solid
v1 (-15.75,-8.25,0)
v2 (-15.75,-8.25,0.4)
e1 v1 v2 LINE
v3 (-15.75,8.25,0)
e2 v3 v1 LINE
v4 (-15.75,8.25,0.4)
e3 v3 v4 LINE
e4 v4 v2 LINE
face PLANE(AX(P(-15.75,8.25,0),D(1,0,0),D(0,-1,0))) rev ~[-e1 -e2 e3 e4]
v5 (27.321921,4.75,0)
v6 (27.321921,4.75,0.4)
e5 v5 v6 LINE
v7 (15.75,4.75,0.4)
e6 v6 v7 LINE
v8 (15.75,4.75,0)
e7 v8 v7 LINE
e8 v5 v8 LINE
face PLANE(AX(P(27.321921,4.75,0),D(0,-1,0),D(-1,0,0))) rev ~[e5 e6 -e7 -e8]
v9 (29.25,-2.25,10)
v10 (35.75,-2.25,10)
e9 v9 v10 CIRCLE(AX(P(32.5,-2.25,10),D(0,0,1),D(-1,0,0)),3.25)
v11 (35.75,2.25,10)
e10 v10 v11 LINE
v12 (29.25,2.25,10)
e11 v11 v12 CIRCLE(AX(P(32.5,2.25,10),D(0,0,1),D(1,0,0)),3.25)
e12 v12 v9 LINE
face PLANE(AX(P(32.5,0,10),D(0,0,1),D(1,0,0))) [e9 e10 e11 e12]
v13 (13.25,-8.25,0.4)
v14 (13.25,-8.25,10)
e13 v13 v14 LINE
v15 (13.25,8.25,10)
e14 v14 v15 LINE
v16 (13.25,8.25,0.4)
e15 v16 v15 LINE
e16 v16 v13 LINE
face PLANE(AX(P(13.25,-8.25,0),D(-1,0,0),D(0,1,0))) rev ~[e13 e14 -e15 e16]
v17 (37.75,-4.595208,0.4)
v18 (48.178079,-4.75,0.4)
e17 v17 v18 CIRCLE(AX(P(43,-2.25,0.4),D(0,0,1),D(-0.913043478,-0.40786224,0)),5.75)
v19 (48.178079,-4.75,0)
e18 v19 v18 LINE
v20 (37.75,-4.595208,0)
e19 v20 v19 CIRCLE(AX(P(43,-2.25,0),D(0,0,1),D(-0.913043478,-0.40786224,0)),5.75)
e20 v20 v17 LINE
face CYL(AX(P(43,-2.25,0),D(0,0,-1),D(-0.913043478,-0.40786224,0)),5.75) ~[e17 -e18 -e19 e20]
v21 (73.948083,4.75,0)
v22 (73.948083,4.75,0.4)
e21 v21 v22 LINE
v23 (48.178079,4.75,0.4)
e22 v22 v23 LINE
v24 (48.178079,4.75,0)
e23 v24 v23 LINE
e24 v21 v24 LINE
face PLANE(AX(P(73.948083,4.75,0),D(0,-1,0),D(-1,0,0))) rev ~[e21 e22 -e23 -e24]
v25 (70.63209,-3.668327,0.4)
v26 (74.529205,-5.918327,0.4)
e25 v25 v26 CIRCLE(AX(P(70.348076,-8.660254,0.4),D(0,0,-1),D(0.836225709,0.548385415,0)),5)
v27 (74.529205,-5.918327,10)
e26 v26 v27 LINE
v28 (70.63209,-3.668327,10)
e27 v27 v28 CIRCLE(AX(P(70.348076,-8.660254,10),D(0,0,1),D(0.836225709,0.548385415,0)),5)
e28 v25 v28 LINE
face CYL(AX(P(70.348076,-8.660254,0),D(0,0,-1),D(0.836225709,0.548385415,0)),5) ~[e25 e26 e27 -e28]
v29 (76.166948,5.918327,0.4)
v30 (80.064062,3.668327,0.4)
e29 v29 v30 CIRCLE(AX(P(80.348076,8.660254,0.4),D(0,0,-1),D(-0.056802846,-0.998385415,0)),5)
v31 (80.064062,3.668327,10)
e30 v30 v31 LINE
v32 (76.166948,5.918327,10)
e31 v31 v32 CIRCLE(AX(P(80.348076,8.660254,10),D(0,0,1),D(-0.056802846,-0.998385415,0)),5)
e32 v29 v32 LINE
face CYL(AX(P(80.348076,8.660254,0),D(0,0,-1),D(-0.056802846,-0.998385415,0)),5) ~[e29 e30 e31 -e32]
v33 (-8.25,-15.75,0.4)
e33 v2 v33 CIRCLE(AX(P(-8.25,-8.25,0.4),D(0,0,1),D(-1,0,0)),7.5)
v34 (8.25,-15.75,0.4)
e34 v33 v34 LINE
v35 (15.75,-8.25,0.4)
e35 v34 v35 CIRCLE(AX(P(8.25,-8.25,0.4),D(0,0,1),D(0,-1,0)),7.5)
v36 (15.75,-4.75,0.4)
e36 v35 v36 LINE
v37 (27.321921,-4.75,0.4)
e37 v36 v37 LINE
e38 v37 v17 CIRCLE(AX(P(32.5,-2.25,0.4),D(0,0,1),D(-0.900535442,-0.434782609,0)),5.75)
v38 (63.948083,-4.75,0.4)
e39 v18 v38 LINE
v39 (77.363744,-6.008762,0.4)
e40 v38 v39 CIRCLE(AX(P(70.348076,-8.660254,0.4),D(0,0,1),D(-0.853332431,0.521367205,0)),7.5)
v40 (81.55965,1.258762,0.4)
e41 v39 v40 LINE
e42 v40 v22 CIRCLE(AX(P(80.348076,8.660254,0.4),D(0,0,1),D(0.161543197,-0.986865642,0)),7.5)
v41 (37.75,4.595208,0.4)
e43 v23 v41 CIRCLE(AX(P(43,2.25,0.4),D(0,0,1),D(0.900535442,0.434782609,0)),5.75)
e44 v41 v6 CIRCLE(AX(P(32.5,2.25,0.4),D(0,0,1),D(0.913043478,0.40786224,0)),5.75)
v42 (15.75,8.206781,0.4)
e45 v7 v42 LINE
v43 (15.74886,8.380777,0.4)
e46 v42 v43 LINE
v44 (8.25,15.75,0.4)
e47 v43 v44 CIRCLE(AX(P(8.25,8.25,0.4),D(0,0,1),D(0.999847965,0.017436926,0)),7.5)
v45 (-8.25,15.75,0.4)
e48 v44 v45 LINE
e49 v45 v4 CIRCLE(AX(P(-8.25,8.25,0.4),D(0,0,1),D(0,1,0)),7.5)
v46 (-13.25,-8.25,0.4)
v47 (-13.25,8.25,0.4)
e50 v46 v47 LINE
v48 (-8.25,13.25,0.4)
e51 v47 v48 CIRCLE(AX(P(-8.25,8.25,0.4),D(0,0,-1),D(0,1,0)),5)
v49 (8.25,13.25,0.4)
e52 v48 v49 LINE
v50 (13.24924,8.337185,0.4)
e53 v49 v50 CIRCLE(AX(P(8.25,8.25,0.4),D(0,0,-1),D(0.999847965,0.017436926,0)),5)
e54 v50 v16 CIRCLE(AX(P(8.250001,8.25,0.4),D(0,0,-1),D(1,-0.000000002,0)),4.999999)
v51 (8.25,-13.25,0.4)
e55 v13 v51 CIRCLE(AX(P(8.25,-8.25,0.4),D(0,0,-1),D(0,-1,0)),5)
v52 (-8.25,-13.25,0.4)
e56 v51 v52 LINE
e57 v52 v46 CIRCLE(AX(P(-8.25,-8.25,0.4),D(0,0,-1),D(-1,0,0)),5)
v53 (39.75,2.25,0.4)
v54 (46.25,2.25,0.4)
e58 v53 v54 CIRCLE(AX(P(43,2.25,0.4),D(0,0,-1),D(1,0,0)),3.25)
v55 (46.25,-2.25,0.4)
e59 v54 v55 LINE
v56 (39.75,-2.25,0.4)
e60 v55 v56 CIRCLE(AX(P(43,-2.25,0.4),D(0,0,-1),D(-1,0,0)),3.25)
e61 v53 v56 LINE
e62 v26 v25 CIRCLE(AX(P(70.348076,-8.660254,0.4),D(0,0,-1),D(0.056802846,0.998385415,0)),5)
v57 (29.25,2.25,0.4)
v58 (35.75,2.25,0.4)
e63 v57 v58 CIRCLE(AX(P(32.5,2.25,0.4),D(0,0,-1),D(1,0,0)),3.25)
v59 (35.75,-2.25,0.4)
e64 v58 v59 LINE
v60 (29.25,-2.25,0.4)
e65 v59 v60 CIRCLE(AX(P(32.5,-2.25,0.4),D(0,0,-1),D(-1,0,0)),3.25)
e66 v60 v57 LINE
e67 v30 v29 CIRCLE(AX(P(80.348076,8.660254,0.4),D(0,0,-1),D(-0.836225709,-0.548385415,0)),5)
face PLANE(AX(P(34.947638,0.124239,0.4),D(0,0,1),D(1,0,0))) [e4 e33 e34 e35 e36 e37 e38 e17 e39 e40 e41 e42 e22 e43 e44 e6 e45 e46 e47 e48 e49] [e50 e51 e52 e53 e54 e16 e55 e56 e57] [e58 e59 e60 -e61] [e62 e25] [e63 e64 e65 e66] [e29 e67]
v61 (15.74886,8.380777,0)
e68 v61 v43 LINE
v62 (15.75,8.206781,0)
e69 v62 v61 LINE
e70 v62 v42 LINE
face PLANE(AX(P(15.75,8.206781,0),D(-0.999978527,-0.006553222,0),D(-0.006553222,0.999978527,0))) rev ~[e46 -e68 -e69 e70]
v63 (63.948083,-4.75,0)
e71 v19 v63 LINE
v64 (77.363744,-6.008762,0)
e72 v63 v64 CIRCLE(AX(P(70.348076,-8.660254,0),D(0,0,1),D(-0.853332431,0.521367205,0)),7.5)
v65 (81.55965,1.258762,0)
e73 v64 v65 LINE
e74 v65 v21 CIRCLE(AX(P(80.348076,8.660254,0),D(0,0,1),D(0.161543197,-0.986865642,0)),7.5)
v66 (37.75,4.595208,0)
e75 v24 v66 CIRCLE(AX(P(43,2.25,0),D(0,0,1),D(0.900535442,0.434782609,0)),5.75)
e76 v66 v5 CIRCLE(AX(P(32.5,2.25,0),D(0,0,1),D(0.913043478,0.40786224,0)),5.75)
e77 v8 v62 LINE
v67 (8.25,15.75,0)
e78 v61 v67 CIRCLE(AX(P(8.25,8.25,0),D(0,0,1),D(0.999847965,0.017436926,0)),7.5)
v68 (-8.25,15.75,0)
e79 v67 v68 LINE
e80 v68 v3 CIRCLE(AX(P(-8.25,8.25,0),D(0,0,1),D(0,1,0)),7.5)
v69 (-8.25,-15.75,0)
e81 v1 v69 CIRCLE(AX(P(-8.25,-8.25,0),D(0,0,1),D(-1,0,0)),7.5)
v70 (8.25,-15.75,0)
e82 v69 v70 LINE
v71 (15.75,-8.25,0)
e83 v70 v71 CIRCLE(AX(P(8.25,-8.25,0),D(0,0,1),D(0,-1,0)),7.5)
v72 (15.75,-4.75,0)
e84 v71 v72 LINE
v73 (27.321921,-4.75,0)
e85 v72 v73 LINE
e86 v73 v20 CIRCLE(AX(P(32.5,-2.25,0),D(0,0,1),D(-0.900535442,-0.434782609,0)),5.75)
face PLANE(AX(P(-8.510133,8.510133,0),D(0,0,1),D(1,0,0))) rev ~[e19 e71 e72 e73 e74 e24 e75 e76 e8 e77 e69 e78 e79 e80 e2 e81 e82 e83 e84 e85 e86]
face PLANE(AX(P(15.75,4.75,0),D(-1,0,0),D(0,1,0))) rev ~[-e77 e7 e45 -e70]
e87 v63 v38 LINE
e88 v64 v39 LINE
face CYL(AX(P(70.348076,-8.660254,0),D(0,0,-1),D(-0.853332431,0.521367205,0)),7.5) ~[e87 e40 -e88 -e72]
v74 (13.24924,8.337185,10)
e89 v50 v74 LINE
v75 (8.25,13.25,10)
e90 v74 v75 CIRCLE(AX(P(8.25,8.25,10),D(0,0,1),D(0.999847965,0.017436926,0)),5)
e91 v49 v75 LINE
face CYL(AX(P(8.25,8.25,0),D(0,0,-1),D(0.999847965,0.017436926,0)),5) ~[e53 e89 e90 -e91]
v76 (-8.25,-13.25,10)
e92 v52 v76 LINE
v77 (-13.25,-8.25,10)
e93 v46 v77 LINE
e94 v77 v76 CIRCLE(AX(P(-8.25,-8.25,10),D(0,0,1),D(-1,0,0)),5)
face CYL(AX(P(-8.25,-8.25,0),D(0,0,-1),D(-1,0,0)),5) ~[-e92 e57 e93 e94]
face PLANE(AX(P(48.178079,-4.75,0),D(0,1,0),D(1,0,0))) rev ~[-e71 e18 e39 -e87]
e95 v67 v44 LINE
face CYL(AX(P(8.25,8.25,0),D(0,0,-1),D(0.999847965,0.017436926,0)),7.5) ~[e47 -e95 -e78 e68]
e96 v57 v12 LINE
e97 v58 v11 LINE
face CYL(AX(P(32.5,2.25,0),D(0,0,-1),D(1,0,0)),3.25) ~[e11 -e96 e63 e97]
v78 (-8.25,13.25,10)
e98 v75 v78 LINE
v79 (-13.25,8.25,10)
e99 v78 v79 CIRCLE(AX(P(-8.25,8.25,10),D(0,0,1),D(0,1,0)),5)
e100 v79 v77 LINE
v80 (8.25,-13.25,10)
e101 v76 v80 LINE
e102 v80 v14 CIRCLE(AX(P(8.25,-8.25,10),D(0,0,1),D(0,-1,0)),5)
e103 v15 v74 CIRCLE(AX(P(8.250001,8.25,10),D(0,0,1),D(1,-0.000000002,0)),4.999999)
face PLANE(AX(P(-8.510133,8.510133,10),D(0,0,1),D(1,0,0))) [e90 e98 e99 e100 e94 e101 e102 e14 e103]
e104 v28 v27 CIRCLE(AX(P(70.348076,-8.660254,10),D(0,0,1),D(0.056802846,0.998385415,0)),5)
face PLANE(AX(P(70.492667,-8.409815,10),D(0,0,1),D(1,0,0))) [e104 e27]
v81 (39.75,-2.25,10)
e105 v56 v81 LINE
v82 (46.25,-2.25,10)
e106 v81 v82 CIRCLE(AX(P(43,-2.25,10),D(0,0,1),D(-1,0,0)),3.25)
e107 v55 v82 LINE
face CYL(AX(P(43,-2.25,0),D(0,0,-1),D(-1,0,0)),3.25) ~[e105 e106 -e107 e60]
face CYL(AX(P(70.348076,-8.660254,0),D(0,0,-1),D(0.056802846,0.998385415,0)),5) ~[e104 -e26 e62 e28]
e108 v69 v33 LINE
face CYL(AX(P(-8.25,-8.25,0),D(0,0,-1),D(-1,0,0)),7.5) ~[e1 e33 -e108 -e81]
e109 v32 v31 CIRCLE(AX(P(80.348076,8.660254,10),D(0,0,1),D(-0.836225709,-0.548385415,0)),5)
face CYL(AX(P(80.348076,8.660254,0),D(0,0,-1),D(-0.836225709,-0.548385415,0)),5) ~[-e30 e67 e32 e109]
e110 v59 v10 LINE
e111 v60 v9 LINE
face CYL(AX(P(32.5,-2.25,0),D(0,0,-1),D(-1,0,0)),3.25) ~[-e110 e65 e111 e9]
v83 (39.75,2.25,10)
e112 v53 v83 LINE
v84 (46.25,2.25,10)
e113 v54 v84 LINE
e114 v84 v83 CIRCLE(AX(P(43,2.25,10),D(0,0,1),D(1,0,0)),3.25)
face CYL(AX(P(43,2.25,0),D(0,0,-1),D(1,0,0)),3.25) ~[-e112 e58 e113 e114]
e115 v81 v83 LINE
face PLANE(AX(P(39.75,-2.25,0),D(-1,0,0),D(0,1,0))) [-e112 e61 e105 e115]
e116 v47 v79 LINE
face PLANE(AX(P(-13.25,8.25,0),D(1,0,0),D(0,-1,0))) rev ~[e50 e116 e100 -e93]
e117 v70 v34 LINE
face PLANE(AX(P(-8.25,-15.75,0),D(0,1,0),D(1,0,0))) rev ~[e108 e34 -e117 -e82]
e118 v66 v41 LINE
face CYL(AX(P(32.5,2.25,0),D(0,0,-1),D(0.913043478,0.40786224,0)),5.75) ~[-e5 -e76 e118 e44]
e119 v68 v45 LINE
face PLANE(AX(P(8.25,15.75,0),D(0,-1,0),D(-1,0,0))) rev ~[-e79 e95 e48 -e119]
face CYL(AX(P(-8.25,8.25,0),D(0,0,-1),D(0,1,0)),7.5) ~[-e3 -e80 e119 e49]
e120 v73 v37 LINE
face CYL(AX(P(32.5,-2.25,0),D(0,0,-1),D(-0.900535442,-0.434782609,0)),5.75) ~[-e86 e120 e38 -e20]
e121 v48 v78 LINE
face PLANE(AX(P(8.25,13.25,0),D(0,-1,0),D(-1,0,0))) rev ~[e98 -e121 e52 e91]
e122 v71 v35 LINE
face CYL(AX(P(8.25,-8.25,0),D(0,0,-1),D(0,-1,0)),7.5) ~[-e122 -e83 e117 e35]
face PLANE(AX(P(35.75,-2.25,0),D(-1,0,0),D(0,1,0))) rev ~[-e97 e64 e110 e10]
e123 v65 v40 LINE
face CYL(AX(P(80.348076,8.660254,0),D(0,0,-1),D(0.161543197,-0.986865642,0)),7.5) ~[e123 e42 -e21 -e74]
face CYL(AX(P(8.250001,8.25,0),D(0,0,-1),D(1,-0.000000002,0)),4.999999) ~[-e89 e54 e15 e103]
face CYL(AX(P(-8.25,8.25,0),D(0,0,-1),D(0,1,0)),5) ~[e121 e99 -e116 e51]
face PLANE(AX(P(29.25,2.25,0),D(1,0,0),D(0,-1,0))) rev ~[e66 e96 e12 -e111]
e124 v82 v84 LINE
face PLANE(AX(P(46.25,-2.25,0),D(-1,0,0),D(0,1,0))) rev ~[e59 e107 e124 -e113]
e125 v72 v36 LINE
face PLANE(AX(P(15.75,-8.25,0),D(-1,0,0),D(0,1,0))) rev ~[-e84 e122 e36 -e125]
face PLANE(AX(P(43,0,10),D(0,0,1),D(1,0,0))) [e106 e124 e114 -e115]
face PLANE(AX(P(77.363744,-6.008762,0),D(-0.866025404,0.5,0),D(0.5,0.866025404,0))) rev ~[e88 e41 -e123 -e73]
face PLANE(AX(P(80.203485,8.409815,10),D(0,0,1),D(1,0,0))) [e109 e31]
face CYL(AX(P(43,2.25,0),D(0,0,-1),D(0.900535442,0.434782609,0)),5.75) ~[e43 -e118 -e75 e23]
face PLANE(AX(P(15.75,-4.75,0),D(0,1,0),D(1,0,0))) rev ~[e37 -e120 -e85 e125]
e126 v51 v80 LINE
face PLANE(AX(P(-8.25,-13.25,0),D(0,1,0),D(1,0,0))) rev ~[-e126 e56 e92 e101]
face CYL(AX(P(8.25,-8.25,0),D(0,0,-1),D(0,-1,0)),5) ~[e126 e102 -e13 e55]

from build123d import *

# Parameters (mm, degrees)
F0_W     = 6.5
F0_H     = 4.5
F0_W_2   = 4
F1_DEPTH = 0.4
F2_DEPTH = 10


with BuildPart() as f1:
    # F0 (on Top) → F1 (new body)
    with BuildSketch(Plane.XY):
        with BuildLine():
            Line((8.25, 15.75), (-8.25, 15.75))
            ThreePointArc((-8.25, 15.75), (-13.5533008589, 13.5533008589), (-15.75, 8.25))
            Line((-15.75, 8.25), (-15.75, -8.25))
            ThreePointArc((-15.75, -8.25), (-13.5533008589, -13.5533008589), (-8.25, -15.75))
            Line((-8.25, -15.75), (8.25, -15.75))
            ThreePointArc((8.25, -15.75), (13.5533008589, -13.5533008589), (15.75, -8.25))
            Line((15.75, -8.25), (15.75, -4.75))
            Line((15.75, -4.75), (27.3219212057, -4.75))
            ThreePointArc((27.3219212057, -4.75), (32.5853423404, -7.9993666334), (37.75, -4.5952078799))
            ThreePointArc((37.75, -4.5952078799), (42.9146576596, -7.9993666334), (48.1780787943, -4.75))
            Line((48.1780787943, -4.75), (63.9480829801, -4.75))
            ThreePointArc((63.9480829801, -4.75), (69.6474451199, -16.1274567319), (77.3637435709, -6.0087617221))
            Line((77.3637435709, -6.0087617221), (81.5596501878, 1.2587617221))
            ThreePointArc((81.5596501878, 1.2587617221), (83.4749132345, 15.4773568118), (73.9480829801, 4.75))
            Line((73.9480829801, 4.75), (48.1780787943, 4.75))
            ThreePointArc((48.1780787943, 4.75), (42.9146576596, 7.9993666334), (37.75, 4.5952078799))
            ThreePointArc((37.75, 4.5952078799), (32.5853423404, 7.9993666334), (27.3219212057, 4.75))
            Line((27.3219212057, 4.75), (15.75, 4.75))
            Line((15.75, 4.75), (15.75, 8.2067806795))
            Line((15.75, 8.2067806795), (15.7488597394, 8.3807769432))
            ThreePointArc((15.7488597394, 8.3807769432), (13.5068608944, 13.5993376728), (8.25, 15.75))
        make_face()
        with BuildLine():
            ThreePointArc((-13.25, 8.25), (-11.7855339059, 11.7855339059), (-8.25, 13.25))
            Line((-8.25, 13.25), (-4.5, 13.25))
            Line((-4.5, 13.25), (4.5, 13.25))
            Line((4.5, 13.25), (8.25, 13.25))
            ThreePointArc((8.25, 13.25), (11.7545739296, 11.8162251152), (13.2492398263, 8.3371846288))
            ThreePointArc((13.2492398263, 8.3371846288), (13.249809953, 8.2935939714), (13.25, 8.25))
            Line((13.25, 8.25), (13.25, 8.2446288243))
            Line((13.25, 8.2446288243), (13.25, 8.2392576486))
            Line((13.25, 8.2392576486), (13.25, 8.2285152972))
            Line((13.25, 8.2285152972), (13.25, 8.2070305943))
            Line((13.25, 8.2070305943), (13.25, 4.5))
            Line((13.25, 4.5), (13.25, 2.25))
            Line((13.25, 2.25), (29.25, 2.25))
            ThreePointArc((29.25, 2.25), (32.5, 5.5), (35.75, 2.25))
            Line((35.75, 2.25), (39.75, 2.25))
            ThreePointArc((39.75, 2.25), (43, 5.5), (46.25, 2.25))
            Line((46.25, 2.25), (72.75, 2.25))
            Line((72.75, 2.25), (74.0490381057, 2.25))
            Line((74.0490381057, 2.25), (76.1669476654, 5.9183269633))
            ThreePointArc((76.1669476654, 5.9183269633), (82.8480762114, 12.9903810568), (80.0640619824, 3.6683269633))
            Line((80.0640619824, 3.6683269633), (74.5292047573, -5.9183269633))
            ThreePointArc((74.5292047573, -5.9183269633), (67.8480762114, -12.9903810568), (70.6320904403, -3.6683269633))
            Line((70.6320904403, -3.6683269633), (71.4509618943, -2.25))
            Line((71.4509618943, -2.25), (46.25, -2.25))
            ThreePointArc((46.25, -2.25), (43, -5.5), (39.75, -2.25))
            Line((39.75, -2.25), (35.75, -2.25))
            ThreePointArc((35.75, -2.25), (32.5, -5.5), (29.25, -2.25))
            Line((29.25, -2.25), (13.25, -2.25))
            Line((13.25, -2.25), (13.25, -4.5))
            Line((13.25, -4.5), (13.25, -8.25))
            ThreePointArc((13.25, -8.25), (11.7855339059, -11.7855339059), (8.25, -13.25))
            Line((8.25, -13.25), (4.5, -13.25))
            Line((4.5, -13.25), (-4.5, -13.25))
            Line((-4.5, -13.25), (-8.25, -13.25))
            ThreePointArc((-8.25, -13.25), (-11.7855339059, -11.7855339059), (-13.25, -8.25))
            Line((-13.25, -8.25), (-13.25, -4.5))
            Line((-13.25, -4.5), (-13.25, 4.5))
            Line((-13.25, 4.5), (-13.25, 8.25))
        make_face(mode=Mode.SUBTRACT)
        Polygon((72.75, 2.25), (46.25, 2.25), (46.25, -2.25), (71.4509618943, -2.25), (74.0490381057, 2.25), align=None)
        Polygon((4.5, 13.25), (-4.5, 13.25), (-4.5, 4.5), (0, 4.5), (4.5, 4.5), align=None)
        Polygon((4.5, -4.5), (0, -4.5), (-4.5, -4.5), (-4.5, -13.25), (4.5, -13.25), align=None)
        Polygon((-4.5, 0), (-4.5, 4.5), (-13.25, 4.5), (-13.25, -4.5), (-4.5, -4.5), align=None)
        Polygon((13.25, 4.5), (4.5, 4.5), (4.5, 0), (4.5, -4.5), (13.25, -4.5), (13.25, -2.25), (13.25, 0), (13.25, 2.25), align=None)
        with BuildLine():
            ThreePointArc((74.5292047573, -5.9183269633), (72.8480762114, -4.3301270189), (70.6320904403, -3.6683269633))
            ThreePointArc((70.6320904403, -3.6683269633), (67.8480762114, -12.9903810568), (74.5292047573, -5.9183269633))
        make_face()
        with BuildLine():
            ThreePointArc((80.0640619824, 3.6683269633), (82.8480762114, 12.9903810568), (76.1669476654, 5.9183269633))
            ThreePointArc((76.1669476654, 5.9183269633), (77.8480762114, 4.3301270189), (80.0640619824, 3.6683269633))
        make_face()
        Polygon((29.25, 2.25), (13.25, 2.25), (13.25, 0), (13.25, -2.25), (29.25, -2.25), (29.25, 0), align=None)
        with BuildLine():
            Line((-4.5, 13.25), (-8.25, 13.25))
            ThreePointArc((-8.25, 13.25), (-11.7855339059, 11.7855339059), (-13.25, 8.25))
            Line((-13.25, 8.25), (-13.25, 4.5))
            Line((-13.25, 4.5), (-4.5, 4.5))
            Line((-4.5, 4.5), (-4.5, 13.25))
        make_face()
        with BuildLine():
            Line((8.25, 13.25), (4.5, 13.25))
            Line((4.5, 13.25), (4.5, 4.5))
            Line((4.5, 4.5), (13.25, 4.5))
            Line((13.25, 4.5), (13.25, 8.2070305943))
            Line((13.25, 8.2070305943), (13.25, 8.2285152972))
            Line((13.25, 8.2285152972), (13.25, 8.2392576486))
            Line((13.25, 8.2392576486), (13.25, 8.2446288243))
            Line((13.25, 8.2446288243), (13.25, 8.25))
            ThreePointArc((13.25, 8.25), (13.249809953, 8.2935939714), (13.2492398263, 8.3371846288))
            ThreePointArc((13.2492398263, 8.3371846288), (11.7545739296, 11.8162251152), (8.25, 13.25))
        make_face()
        with BuildLine():
            Line((-4.5, -4.5), (-13.25, -4.5))
            Line((-13.25, -4.5), (-13.25, -8.25))
            ThreePointArc((-13.25, -8.25), (-11.7855339059, -11.7855339059), (-8.25, -13.25))
            Line((-8.25, -13.25), (-4.5, -13.25))
            Line((-4.5, -13.25), (-4.5, -4.5))
        make_face()
        with BuildLine():
            Line((13.25, -4.5), (4.5, -4.5))
            Line((4.5, -4.5), (4.5, -13.25))
            Line((4.5, -13.25), (8.25, -13.25))
            ThreePointArc((8.25, -13.25), (11.7855339059, -11.7855339059), (13.25, -8.25))
            Line((13.25, -8.25), (13.25, -4.5))
        make_face()
        with BuildLine():
            ThreePointArc((0, 4.5), (-3.1819805153, 3.1819805153), (-4.5, 0))
            ThreePointArc((-4.5, 0), (-3.1819805153, -3.1819805153), (0, -4.5))
            ThreePointArc((0, -4.5), (3.1819805153, -3.1819805153), (4.5, 0))
            ThreePointArc((4.5, 0), (3.1819805153, 3.1819805153), (0, 4.5))
        make_face()
        with BuildLine():
            Line((74.0490381057, 2.25), (71.4509618943, -2.25))
            Line((71.4509618943, -2.25), (70.6320904403, -3.6683269633))
            ThreePointArc((70.6320904403, -3.6683269633), (72.8480762114, -4.3301270189), (74.5292047573, -5.9183269633))
            Line((74.5292047573, -5.9183269633), (80.0640619824, 3.6683269633))
            ThreePointArc((80.0640619824, 3.6683269633), (77.8480762114, 4.3301270189), (76.1669476654, 5.9183269633))
            Line((76.1669476654, 5.9183269633), (74.0490381057, 2.25))
        make_face()
        with Locations((43, 0)):
            Rectangle(F0_W, F0_H)
        Polygon((35.75, 2.25), (29.25, 2.25), (29.25, 0), (29.25, -2.25), (35.75, -2.25), align=None)
        with Locations((37.75, 0)):
            Rectangle(F0_W_2, F0_H)
        with BuildLine():
            ThreePointArc((35.75, 2.25), (32.5, 5.5), (29.25, 2.25))
            Line((29.25, 2.25), (35.75, 2.25))
        make_face()
        with BuildLine():
            Line((35.75, -2.25), (29.25, -2.25))
            ThreePointArc((29.25, -2.25), (32.5, -5.5), (35.75, -2.25))
        make_face()
        with BuildLine():
            Line((46.25, -2.25), (39.75, -2.25))
            ThreePointArc((39.75, -2.25), (43, -5.5), (46.25, -2.25))
        make_face()
        with BuildLine():
            ThreePointArc((46.25, 2.25), (43, 5.5), (39.75, 2.25))
            Line((39.75, 2.25), (46.25, 2.25))
        make_face()
        with BuildLine():
            ThreePointArc((0, -4.5), (-3.1819805153, -3.1819805153), (-4.5, 0))
            Line((-4.5, 0), (-4.5, -4.5))
            Line((-4.5, -4.5), (0, -4.5))
        make_face()
        with BuildLine():
            Line((0, 4.5), (-4.5, 4.5))
            Line((-4.5, 4.5), (-4.5, 0))
            ThreePointArc((-4.5, 0), (-3.1819805153, 3.1819805153), (0, 4.5))
        make_face()
        with BuildLine():
            Line((4.5, -4.5), (4.5, 0))
            ThreePointArc((4.5, 0), (3.1819805153, -3.1819805153), (0, -4.5))
            Line((0, -4.5), (4.5, -4.5))
        make_face()
        with BuildLine():
            Line((4.5, 0), (4.5, 4.5))
            Line((4.5, 4.5), (0, 4.5))
            ThreePointArc((0, 4.5), (3.1819805153, 3.1819805153), (4.5, 0))
        make_face()
    extrude(amount=F1_DEPTH)

    # F0 (on Top) → F2 (join)
    with BuildSketch(Plane.XY):
        with BuildLine():
            Line((-4.5, 13.25), (-8.25, 13.25))
            ThreePointArc((-8.25, 13.25), (-11.7855339059, 11.7855339059), (-13.25, 8.25))
            Line((-13.25, 8.25), (-13.25, 4.5))
            Line((-13.25, 4.5), (-4.5, 4.5))
            Line((-4.5, 4.5), (-4.5, 13.25))
        make_face()
        Polygon((4.5, 13.25), (-4.5, 13.25), (-4.5, 4.5), (0, 4.5), (4.5, 4.5), align=None)
        with BuildLine():
            Line((8.25, 13.25), (4.5, 13.25))
            Line((4.5, 13.25), (4.5, 4.5))
            Line((4.5, 4.5), (13.25, 4.5))
            Line((13.25, 4.5), (13.25, 8.2070305943))
            Line((13.25, 8.2070305943), (13.25, 8.2285152972))
            Line((13.25, 8.2285152972), (13.25, 8.2392576486))
            Line((13.25, 8.2392576486), (13.25, 8.2446288243))
            Line((13.25, 8.2446288243), (13.25, 8.25))
            ThreePointArc((13.25, 8.25), (13.249809953, 8.2935939714), (13.2492398263, 8.3371846288))
            ThreePointArc((13.2492398263, 8.3371846288), (11.7545739296, 11.8162251152), (8.25, 13.25))
        make_face()
        with BuildLine():
            Line((0, 4.5), (-4.5, 4.5))
            Line((-4.5, 4.5), (-4.5, 0))
            ThreePointArc((-4.5, 0), (-3.1819805153, 3.1819805153), (0, 4.5))
        make_face()
        Polygon((-4.5, 0), (-4.5, 4.5), (-13.25, 4.5), (-13.25, -4.5), (-4.5, -4.5), align=None)
        Polygon((13.25, 4.5), (4.5, 4.5), (4.5, 0), (4.5, -4.5), (13.25, -4.5), (13.25, -2.25), (13.25, 0), (13.25, 2.25), align=None)
        with BuildLine():
            Line((4.5, 0), (4.5, 4.5))
            Line((4.5, 4.5), (0, 4.5))
            ThreePointArc((0, 4.5), (3.1819805153, 3.1819805153), (4.5, 0))
        make_face()
        with BuildLine():
            ThreePointArc((0, 4.5), (-3.1819805153, 3.1819805153), (-4.5, 0))
            ThreePointArc((-4.5, 0), (-3.1819805153, -3.1819805153), (0, -4.5))
            ThreePointArc((0, -4.5), (3.1819805153, -3.1819805153), (4.5, 0))
            ThreePointArc((4.5, 0), (3.1819805153, 3.1819805153), (0, 4.5))
        make_face()
        with BuildLine():
            ThreePointArc((0, -4.5), (-3.1819805153, -3.1819805153), (-4.5, 0))
            Line((-4.5, 0), (-4.5, -4.5))
            Line((-4.5, -4.5), (0, -4.5))
        make_face()
        with BuildLine():
            Line((-4.5, -4.5), (-13.25, -4.5))
            Line((-13.25, -4.5), (-13.25, -8.25))
            ThreePointArc((-13.25, -8.25), (-11.7855339059, -11.7855339059), (-8.25, -13.25))
            Line((-8.25, -13.25), (-4.5, -13.25))
            Line((-4.5, -13.25), (-4.5, -4.5))
        make_face()
        with BuildLine():
            Line((4.5, -4.5), (4.5, 0))
            ThreePointArc((4.5, 0), (3.1819805153, -3.1819805153), (0, -4.5))
            Line((0, -4.5), (4.5, -4.5))
        make_face()
        Polygon((4.5, -4.5), (0, -4.5), (-4.5, -4.5), (-4.5, -13.25), (4.5, -13.25), align=None)
        with BuildLine():
            Line((13.25, -4.5), (4.5, -4.5))
            Line((4.5, -4.5), (4.5, -13.25))
            Line((4.5, -13.25), (8.25, -13.25))
            ThreePointArc((8.25, -13.25), (11.7855339059, -11.7855339059), (13.25, -8.25))
            Line((13.25, -8.25), (13.25, -4.5))
        make_face()
        Polygon((35.75, 2.25), (29.25, 2.25), (29.25, 0), (29.25, -2.25), (35.75, -2.25), align=None)
        with BuildLine():
            ThreePointArc((35.75, 2.25), (32.5, 5.5), (29.25, 2.25))
            Line((29.25, 2.25), (35.75, 2.25))
        make_face()
        with BuildLine():
            Line((35.75, -2.25), (29.25, -2.25))
            ThreePointArc((29.25, -2.25), (32.5, -5.5), (35.75, -2.25))
        make_face()
        with Locations((43, 0)):
            Rectangle(F0_W, F0_H)
        with BuildLine():
            ThreePointArc((46.25, 2.25), (43, 5.5), (39.75, 2.25))
            Line((39.75, 2.25), (46.25, 2.25))
        make_face()
        with BuildLine():
            Line((46.25, -2.25), (39.75, -2.25))
            ThreePointArc((39.75, -2.25), (43, -5.5), (46.25, -2.25))
        make_face()
        with BuildLine():
            ThreePointArc((74.5292047573, -5.9183269633), (72.8480762114, -4.3301270189), (70.6320904403, -3.6683269633))
            ThreePointArc((70.6320904403, -3.6683269633), (67.8480762114, -12.9903810568), (74.5292047573, -5.9183269633))
        make_face()
        with BuildLine():
            ThreePointArc((80.0640619824, 3.6683269633), (82.8480762114, 12.9903810568), (76.1669476654, 5.9183269633))
            ThreePointArc((76.1669476654, 5.9183269633), (77.8480762114, 4.3301270189), (80.0640619824, 3.6683269633))
        make_face()
    extrude(amount=F2_DEPTH)


solid = f1.part
